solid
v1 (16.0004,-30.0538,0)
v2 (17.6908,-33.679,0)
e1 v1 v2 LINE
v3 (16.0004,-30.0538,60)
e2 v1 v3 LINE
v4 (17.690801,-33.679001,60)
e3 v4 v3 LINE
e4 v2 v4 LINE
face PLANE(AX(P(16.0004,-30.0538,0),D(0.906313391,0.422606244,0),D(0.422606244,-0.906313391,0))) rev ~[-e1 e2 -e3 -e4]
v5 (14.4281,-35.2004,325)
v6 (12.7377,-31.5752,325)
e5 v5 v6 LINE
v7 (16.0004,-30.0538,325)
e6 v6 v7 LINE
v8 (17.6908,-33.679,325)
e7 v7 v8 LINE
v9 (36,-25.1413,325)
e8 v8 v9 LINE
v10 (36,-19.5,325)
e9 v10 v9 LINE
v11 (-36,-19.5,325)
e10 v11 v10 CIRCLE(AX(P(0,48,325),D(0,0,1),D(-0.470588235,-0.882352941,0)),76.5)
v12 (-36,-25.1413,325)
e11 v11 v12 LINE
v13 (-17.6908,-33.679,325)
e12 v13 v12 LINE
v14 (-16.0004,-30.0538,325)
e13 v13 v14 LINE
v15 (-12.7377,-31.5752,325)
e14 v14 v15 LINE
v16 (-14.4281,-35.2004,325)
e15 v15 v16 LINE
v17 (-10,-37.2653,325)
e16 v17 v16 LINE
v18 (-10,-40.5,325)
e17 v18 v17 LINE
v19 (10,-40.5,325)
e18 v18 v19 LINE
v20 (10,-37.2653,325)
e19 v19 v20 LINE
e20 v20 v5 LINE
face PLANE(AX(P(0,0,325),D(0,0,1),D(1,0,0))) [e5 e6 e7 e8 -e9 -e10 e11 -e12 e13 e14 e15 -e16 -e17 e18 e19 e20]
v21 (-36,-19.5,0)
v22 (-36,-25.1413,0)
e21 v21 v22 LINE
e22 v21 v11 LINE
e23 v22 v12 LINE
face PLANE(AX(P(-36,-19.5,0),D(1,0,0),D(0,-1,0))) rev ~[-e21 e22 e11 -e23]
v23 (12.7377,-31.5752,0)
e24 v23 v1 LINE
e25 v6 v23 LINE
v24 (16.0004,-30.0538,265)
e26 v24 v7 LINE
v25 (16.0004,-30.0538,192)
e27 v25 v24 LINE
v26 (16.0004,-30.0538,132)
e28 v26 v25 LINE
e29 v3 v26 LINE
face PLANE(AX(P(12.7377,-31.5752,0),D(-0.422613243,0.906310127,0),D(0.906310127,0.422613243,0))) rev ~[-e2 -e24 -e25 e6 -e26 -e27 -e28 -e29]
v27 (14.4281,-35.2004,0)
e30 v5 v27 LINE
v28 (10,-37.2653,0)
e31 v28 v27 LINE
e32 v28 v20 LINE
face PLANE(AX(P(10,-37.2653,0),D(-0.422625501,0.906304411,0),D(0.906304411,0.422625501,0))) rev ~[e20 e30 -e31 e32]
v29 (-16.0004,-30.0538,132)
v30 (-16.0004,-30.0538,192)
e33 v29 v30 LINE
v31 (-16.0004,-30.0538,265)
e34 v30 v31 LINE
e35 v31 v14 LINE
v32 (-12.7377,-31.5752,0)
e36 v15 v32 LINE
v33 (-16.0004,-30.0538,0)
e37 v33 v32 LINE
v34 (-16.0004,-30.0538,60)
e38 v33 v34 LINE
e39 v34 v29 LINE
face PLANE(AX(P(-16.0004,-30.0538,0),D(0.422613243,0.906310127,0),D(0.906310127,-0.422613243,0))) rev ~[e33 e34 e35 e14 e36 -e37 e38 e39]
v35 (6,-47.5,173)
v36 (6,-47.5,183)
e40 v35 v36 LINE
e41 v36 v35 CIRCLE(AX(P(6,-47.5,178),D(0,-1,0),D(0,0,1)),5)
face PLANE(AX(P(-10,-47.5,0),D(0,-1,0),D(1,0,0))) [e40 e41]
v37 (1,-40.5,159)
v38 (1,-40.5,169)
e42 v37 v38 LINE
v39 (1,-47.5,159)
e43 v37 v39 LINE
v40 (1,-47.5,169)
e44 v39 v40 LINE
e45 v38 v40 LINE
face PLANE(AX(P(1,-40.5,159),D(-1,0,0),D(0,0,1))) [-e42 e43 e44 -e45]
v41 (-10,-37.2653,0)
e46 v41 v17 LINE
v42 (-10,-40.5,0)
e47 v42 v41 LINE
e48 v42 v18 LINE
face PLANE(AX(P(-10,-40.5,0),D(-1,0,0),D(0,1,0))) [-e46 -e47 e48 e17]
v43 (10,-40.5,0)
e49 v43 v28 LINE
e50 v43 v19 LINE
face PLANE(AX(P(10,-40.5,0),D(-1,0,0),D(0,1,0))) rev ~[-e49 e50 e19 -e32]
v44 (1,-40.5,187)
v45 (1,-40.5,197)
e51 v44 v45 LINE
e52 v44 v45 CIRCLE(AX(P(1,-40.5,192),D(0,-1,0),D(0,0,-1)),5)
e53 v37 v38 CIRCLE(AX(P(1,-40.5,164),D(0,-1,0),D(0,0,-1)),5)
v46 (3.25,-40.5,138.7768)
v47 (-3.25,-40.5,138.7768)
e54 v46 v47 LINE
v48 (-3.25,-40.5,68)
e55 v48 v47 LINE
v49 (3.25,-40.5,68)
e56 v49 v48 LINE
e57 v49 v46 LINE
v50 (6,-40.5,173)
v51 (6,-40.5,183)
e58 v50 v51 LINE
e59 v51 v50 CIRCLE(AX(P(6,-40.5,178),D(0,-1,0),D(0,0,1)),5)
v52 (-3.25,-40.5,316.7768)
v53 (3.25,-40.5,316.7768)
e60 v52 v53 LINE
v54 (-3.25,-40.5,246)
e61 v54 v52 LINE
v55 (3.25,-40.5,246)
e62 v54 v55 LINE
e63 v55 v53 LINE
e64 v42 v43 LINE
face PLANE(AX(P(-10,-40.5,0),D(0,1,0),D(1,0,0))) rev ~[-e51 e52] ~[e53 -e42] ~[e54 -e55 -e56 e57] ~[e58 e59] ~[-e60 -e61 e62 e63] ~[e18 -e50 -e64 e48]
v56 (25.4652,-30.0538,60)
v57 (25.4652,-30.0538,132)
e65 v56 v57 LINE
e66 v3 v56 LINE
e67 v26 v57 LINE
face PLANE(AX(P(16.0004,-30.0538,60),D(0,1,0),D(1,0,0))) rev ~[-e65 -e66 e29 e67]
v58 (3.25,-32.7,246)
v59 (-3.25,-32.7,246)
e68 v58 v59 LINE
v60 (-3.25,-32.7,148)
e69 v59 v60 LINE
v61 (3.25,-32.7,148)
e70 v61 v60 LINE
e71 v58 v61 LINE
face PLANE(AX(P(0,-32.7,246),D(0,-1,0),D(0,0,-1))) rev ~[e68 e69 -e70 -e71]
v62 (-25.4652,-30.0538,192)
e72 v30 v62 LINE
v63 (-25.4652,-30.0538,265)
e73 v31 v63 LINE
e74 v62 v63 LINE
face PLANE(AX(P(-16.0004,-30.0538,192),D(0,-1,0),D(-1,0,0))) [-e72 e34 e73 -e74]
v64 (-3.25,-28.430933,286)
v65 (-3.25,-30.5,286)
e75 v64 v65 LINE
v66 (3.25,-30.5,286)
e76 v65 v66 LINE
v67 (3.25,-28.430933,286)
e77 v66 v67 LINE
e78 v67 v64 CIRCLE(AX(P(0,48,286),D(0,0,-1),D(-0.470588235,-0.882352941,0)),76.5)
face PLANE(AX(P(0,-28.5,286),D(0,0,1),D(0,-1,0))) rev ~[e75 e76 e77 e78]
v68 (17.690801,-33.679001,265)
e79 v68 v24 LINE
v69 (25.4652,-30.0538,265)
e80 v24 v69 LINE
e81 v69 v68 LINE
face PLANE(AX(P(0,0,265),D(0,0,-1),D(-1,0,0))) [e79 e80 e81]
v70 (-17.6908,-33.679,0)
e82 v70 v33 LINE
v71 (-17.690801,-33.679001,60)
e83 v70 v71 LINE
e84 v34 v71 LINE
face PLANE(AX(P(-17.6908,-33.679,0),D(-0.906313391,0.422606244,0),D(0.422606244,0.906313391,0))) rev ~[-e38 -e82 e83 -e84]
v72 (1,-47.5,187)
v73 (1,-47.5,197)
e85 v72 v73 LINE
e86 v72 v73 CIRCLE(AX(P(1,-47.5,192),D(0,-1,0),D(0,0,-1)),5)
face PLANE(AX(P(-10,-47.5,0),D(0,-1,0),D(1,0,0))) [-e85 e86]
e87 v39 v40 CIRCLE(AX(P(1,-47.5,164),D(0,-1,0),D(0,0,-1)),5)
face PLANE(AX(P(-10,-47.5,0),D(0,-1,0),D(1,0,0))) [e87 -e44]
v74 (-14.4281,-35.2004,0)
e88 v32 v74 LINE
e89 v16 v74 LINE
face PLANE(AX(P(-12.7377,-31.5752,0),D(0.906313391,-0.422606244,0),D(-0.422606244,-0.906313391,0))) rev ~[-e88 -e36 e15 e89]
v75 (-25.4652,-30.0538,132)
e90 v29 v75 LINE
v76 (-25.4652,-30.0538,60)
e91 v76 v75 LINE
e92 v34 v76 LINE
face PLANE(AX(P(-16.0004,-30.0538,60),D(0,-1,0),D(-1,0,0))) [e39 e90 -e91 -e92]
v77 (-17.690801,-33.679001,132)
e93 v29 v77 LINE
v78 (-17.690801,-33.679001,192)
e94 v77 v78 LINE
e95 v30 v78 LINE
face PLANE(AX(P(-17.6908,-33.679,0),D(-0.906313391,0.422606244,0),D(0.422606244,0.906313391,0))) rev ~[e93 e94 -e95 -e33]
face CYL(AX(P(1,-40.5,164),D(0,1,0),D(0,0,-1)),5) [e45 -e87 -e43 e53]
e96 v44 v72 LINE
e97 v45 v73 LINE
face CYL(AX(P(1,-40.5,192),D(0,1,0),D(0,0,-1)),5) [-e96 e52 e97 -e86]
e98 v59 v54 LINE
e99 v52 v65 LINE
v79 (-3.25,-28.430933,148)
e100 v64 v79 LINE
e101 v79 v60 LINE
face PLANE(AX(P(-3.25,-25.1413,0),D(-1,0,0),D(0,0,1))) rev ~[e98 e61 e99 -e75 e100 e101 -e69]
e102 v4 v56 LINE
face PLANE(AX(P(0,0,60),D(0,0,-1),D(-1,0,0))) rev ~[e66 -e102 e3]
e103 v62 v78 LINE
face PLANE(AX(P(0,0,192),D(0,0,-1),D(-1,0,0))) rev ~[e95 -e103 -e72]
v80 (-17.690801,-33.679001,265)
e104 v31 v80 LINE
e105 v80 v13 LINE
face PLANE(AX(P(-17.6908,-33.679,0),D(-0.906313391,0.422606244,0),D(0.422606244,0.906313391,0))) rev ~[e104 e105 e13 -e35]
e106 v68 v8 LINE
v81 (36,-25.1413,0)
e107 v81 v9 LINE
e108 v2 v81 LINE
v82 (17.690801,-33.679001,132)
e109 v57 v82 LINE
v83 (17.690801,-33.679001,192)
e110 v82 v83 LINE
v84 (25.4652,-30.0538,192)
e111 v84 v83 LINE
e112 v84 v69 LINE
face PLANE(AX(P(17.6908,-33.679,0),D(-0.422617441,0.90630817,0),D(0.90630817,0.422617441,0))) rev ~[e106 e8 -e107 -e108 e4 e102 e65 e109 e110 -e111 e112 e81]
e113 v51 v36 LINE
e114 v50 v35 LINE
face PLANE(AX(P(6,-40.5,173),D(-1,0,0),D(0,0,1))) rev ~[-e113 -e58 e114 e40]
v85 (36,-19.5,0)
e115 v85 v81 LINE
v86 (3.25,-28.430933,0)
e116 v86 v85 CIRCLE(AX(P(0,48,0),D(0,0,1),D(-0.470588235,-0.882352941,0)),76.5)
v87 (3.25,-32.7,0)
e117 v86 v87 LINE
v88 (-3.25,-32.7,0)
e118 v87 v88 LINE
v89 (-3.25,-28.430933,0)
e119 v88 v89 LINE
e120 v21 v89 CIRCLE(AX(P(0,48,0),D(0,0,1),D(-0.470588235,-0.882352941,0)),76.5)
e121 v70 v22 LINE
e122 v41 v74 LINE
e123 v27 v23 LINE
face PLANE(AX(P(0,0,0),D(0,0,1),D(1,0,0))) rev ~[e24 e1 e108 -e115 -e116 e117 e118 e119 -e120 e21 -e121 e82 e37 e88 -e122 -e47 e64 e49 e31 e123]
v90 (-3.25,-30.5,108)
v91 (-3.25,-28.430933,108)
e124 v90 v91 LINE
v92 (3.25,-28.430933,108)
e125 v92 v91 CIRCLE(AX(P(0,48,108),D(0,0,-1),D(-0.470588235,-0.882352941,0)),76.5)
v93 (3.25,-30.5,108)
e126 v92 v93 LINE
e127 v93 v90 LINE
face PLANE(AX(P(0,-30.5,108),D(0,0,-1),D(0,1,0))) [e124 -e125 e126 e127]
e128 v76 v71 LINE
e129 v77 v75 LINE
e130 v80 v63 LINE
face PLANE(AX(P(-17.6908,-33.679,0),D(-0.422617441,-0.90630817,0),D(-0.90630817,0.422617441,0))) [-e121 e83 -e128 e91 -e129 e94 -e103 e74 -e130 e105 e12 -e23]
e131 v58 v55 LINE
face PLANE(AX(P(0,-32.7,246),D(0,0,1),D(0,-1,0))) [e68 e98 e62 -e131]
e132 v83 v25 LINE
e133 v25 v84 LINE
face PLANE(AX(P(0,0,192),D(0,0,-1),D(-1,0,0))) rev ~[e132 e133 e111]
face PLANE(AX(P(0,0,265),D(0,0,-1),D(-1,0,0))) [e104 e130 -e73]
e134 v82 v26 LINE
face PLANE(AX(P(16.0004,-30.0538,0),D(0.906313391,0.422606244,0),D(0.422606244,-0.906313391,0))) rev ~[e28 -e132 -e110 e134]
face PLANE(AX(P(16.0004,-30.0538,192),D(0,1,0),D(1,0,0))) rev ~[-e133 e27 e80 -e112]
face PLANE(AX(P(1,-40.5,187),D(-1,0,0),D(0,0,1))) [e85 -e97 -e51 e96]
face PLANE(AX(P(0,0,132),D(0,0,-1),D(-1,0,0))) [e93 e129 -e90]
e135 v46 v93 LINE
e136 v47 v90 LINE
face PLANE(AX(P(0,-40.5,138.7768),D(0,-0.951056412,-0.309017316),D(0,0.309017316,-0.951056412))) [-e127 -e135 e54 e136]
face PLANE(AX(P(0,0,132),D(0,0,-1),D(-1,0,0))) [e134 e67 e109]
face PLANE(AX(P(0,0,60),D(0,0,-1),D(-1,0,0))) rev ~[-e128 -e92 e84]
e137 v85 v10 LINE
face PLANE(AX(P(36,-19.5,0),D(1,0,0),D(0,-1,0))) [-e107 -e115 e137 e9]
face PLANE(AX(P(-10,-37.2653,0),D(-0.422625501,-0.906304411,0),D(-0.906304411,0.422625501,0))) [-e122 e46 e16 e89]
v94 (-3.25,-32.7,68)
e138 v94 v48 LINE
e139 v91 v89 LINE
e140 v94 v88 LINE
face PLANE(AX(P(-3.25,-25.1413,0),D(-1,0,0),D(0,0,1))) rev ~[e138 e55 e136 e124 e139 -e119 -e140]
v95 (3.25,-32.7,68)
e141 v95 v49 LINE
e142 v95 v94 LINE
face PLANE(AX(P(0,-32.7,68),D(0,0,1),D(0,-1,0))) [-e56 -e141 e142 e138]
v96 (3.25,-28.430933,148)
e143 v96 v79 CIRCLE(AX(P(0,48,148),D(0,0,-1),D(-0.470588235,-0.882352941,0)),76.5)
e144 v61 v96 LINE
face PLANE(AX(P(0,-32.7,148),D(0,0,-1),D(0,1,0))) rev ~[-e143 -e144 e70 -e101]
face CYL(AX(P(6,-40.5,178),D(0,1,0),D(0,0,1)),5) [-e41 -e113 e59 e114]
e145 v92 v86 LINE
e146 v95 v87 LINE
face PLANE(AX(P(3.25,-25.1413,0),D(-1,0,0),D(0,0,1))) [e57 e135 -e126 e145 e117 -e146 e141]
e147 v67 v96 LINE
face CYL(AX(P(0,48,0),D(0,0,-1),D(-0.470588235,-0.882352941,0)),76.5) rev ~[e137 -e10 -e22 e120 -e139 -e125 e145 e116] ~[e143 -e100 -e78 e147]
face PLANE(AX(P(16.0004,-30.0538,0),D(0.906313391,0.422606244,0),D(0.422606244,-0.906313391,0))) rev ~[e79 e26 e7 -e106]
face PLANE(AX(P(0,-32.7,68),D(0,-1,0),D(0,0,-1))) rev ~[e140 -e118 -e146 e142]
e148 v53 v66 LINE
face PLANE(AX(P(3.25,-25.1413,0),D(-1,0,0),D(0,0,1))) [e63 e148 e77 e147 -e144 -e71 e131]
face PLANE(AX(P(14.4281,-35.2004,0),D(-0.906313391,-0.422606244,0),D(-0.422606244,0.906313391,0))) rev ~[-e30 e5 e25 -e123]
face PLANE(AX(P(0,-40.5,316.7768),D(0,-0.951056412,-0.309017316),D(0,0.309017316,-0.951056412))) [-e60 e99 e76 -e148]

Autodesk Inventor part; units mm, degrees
sketch "Sketch1" plane through (0, 0, 0) normal (0, 0, 1) x (1, 0, 0)
  line L0 (0, 0) -> (-20.6965, 9.6509) construction
  line L1 (0, 0) -> (0, -60.6509) construction
  line L2 (0, 0) -> (-23.2307, -49.8183) construction
  line L3 (0, 0) -> (21.0241, 9.8037) construction
  line L4 (0, 0) -> (21.5225, -46.1553) construction
  line L5 (0, 0) -> (0, 48) construction
  arc A0 (-36, -19.5) -> (36, -19.5) centre (0, 48) ccw
  line L6 (-36, -19.5) -> (-36, -25.1413)
  line L7 (36, -19.5) -> (36, -25.1413)
  line L8 (-10, -40.5) -> (10, -40.5)
  line L9 (-10, -40.5) -> (-10, -37.2653)
  line L10 (10, -40.5) -> (10, -37.2653)
  line L11 (-17.6908, -33.679) -> (-16.0004, -30.0538)
  line L12 (-16.0004, -30.0538) -> (-12.7377, -31.5752)
  line L13 (-12.7377, -31.5752) -> (-14.4281, -35.2004)
  line L14 (14.4281, -35.2004) -> (12.7377, -31.5752)
  line L15 (12.7377, -31.5752) -> (16.0004, -30.0538)
  line L16 (16.0004, -30.0538) -> (17.6908, -33.679)
  line L17 (10, -37.2653) -> (14.4281, -35.2004)
  line L18 (17.6908, -33.679) -> (36, -25.1413)
  line L19 (-10, -37.2653) -> (-14.4281, -35.2004)
  line L20 (-17.6908, -33.679) -> (-36, -25.1413)
  dimension "d0" = 25
  dimension "d1" = 90
  dimension "d2" = 90
  dimension "d3" = 25
  dimension "d4" = 48
  dimension "d5" = 153
  dimension "d11" = 72
  dimension "d12" = 36
  dimension "d13" = 20
  dimension "d14" = 10
  dimension "d17" = 88.5
  dimension "d18" = 3.6
  dimension "d19" = 1.8
  dimension "d20" = 4
  dimension "d21" = 1.8
  dimension "d22" = 1.8
  dimension "d23" = 4
extrude "Extrusion1" add sketch "Sketch1" along normal blind 325
ref_plane "Work Plane1" through (0, 0, 60) normal (0, 0, -1) x (-1, 0, 0)
sketch "Sketch2" plane through (0, 0, 60) normal (0, 0, -1) x (-1, 0, 0)
  line L0 (14.4281, -35.2004) -> (12.7377, -31.5752)
  line L1 (12.7377, -31.5752) -> (16.0004, -30.0538)
  line L2 (14.4281, -35.2004) -> (10, -37.2653) projected
  line L3 (16.0004, -30.0538) -> (25.4652, -30.0538)
  line L4 (25.4652, -30.0538) -> (14.4281, -35.2004)
  line L5 (12.7377, -31.5752) -> (14.4281, -35.2004) projected
  line L6 (16.0004, -30.0538) -> (12.7377, -31.5752) projected
  line L7 (36, -25.1413) -> (17.6908, -33.679) projected
  line L8 (10, -40.5) -> (-10, -40.5) projected
  line L9 (-14.4281, -35.2004) -> (-12.7377, -31.5752)
  line L10 (-12.7377, -31.5752) -> (-16.0004, -30.0538)
  line L11 (-16.0004, -30.0538) -> (-25.4652, -30.0538)
  line L12 (-25.4652, -30.0538) -> (-14.4281, -35.2004)
  line L13 (-14.4281, -35.2004) -> (-12.7377, -31.5752) projected
  line L14 (-12.7377, -31.5752) -> (-16.0004, -30.0538) projected
  line L15 (-10, -37.2653) -> (-14.4281, -35.2004) projected
  line L16 (-17.6908, -33.679) -> (-36, -25.1413) projected
  point P0 (0, 0)
extrude "Extrusion2" cut sketch "Sketch2" against normal blind 72
ref_plane "Work Plane2" through (0, 0, 192) normal (0, 0, -1) x (-1, 0, 0)
sketch "Sketch3" plane through (0, 0, 192) normal (0, 0, -1) x (-1, 0, 0)
  line L0 (14.4281, -35.2004) -> (12.7377, -31.5752)
  line L1 (12.7377, -31.5752) -> (14.4281, -35.2004) projected
  line L2 (12.7377, -31.5752) -> (16.0004, -30.0538)
  line L3 (16.0004, -30.0538) -> (25.4652, -30.0538)
  line L4 (25.4652, -30.0538) -> (14.4281, -35.2004)
  line L5 (-14.4281, -35.2004) -> (-12.7377, -31.5752)
  line L6 (-12.7377, -31.5752) -> (-16.0004, -30.0538)
  line L7 (-16.0004, -30.0538) -> (-25.4652, -30.0538)
  line L8 (-25.4652, -30.0538) -> (-14.4281, -35.2004)
  line L9 (16.0004, -30.0538) -> (12.7377, -31.5752) projected
  line L10 (14.4281, -35.2004) -> (10, -37.2653) projected
  line L11 (-14.4281, -35.2004) -> (-12.7377, -31.5752) projected
  line L12 (-12.7377, -31.5752) -> (-16.0004, -30.0538) projected
  line L13 (-10, -37.2653) -> (-14.4281, -35.2004) projected
  line L14 (10, -40.5) -> (-10, -40.5) projected
  line L15 (36, -25.1413) -> (17.6908, -33.679) projected
  point P0 (0, 0)
extrude "Extrusion3" cut sketch "Sketch3" against normal blind 73
ref_plane "Work Plane3" through (0, -25.1413, 0) normal (-1, 0, 0) x (0, 0, 1)
sketch "Sketch5" plane through (0, -25.1413, 0) normal (-1, 0, 0) x (0, 0, 1)
  line L0 (0, -7.5587) -> (0, -3.3587)
  line L1 (68, -7.5587) -> (68, -15.3587)
  line L2 (68, -15.3587) -> (138.7768, -15.3587)
  line L3 (138.7768, -15.3587) -> (108, -5.3587)
  line L4 (108, -5.3587) -> (108, -3.3587)
  line L5 (0, -15.3587) -> (325, -15.3587) projected
  line L6 (246, -7.5587) -> (246, -15.3587)
  line L7 (246, -15.3587) -> (316.7768, -15.3587)
  line L8 (68, -7.5587) -> (0, -7.5587)
  line L9 (286, -3.3587) -> (286, -5.3587)
  line L10 (316.7768, -15.3587) -> (286, -5.3587)
  line L11 (0, -3.3587) -> (0, -0.3587)
  line L12 (0, -8.5377) -> (0, 0) projected
  line L13 (0, 5.6413) -> (325, 5.6413) projected
  line L14 (286, -0.3587) -> (286, -3.3587)
  line L15 (246, -7.5587) -> (148, -7.5587)
  line L16 (148, -7.5587) -> (148, -3.3587)
  line L17 (108, -0.3587) -> (108, -3.3587)
  line L18 (325, -3.3587) -> (0, -3.3587) projected
  line L19 (148, -3.3587) -> (148, -0.3587)
  line L20 (0, -3.3587) -> (108, -3.3587)
  line L21 (148, -3.3587) -> (286, -3.3587)
  line L22 (0, -0.3587) -> (108, -0.3587)
  line L23 (148, -0.3587) -> (286, -0.3587)
  point P0 (0, 25.1413)
  dimension "d51" = 4.2
  dimension "d52" = 0
  dimension "d53" = 68
  dimension "d54" = 2
  dimension "d56" = 40
  dimension "d59" = 246
  dimension "d64" = 18
  dimension "d65" = 2
  dimension "d68" = 3
  dimension "d69" = 40
  dimension "d84" = 178
  dimension "d94" = 18
  dimension "d96" = 40
extrude "Extrusion4" cut sketch "Sketch5" along normal mid plane 6.5 contours L0 L18 L4 L3 L2 L1 L8 | L11 L22 L17 L18 | L18 L9 L10 L5 L6 L15 L16 | L19 L23 L14 L18
sketch "Sketch6" plane through (-10, -40.5, 0) normal (0, -1, 0) x (1, 0, 0)
  line L0 (-49, 178) -> (79, 178) construction
  line L1 (10, 0) -> (10, 369) construction
  arc A0 (11, 159) -> (11, 169) centre (11, 164) ccw
  arc A1 (16, 183) -> (16, 173) centre (16, 178) ccw
  line L2 (11, 159) -> (11, 169)
  line L3 (16, 173) -> (16, 183)
  line L4 (11, 187) -> (11, 197)
  arc A2 (11, 187) -> (11, 197) centre (11, 192) ccw
  point P0 (4, 178)
  dimension "d70" = 178
  dimension "d85" = 1
  dimension "d86" = 5
  dimension "d87" = 5
  dimension "d88" = 6
  dimension "d89" = 5
  dimension "d90" = 1
  dimension "d91" = 14
  dimension "d92" = 14
extrude "Extrusion5" add sketch "Sketch6" along normal blind 7
equation "\"BendRadius\" = Thickness"
equation "\"BendReliefWidth\" = Thickness"
equation "\"BendReliefDepth\" = 0.5 * Thickness"
equation "\"CornerReliefSize\" = 4 * Thickness"
equation "\"MinimumRemnant\" = 2 * Thickness"
equation "\"TransitionRadius\" = BendRadius"
equation "\"JacobiRadiusSize\" = BendRadius"
equation "\"GapSize\" = Thickness"
equation "\"Thickness\" = 0.5"
properties part number "3213_Bed Holder" material "Acetal Resin, White"
